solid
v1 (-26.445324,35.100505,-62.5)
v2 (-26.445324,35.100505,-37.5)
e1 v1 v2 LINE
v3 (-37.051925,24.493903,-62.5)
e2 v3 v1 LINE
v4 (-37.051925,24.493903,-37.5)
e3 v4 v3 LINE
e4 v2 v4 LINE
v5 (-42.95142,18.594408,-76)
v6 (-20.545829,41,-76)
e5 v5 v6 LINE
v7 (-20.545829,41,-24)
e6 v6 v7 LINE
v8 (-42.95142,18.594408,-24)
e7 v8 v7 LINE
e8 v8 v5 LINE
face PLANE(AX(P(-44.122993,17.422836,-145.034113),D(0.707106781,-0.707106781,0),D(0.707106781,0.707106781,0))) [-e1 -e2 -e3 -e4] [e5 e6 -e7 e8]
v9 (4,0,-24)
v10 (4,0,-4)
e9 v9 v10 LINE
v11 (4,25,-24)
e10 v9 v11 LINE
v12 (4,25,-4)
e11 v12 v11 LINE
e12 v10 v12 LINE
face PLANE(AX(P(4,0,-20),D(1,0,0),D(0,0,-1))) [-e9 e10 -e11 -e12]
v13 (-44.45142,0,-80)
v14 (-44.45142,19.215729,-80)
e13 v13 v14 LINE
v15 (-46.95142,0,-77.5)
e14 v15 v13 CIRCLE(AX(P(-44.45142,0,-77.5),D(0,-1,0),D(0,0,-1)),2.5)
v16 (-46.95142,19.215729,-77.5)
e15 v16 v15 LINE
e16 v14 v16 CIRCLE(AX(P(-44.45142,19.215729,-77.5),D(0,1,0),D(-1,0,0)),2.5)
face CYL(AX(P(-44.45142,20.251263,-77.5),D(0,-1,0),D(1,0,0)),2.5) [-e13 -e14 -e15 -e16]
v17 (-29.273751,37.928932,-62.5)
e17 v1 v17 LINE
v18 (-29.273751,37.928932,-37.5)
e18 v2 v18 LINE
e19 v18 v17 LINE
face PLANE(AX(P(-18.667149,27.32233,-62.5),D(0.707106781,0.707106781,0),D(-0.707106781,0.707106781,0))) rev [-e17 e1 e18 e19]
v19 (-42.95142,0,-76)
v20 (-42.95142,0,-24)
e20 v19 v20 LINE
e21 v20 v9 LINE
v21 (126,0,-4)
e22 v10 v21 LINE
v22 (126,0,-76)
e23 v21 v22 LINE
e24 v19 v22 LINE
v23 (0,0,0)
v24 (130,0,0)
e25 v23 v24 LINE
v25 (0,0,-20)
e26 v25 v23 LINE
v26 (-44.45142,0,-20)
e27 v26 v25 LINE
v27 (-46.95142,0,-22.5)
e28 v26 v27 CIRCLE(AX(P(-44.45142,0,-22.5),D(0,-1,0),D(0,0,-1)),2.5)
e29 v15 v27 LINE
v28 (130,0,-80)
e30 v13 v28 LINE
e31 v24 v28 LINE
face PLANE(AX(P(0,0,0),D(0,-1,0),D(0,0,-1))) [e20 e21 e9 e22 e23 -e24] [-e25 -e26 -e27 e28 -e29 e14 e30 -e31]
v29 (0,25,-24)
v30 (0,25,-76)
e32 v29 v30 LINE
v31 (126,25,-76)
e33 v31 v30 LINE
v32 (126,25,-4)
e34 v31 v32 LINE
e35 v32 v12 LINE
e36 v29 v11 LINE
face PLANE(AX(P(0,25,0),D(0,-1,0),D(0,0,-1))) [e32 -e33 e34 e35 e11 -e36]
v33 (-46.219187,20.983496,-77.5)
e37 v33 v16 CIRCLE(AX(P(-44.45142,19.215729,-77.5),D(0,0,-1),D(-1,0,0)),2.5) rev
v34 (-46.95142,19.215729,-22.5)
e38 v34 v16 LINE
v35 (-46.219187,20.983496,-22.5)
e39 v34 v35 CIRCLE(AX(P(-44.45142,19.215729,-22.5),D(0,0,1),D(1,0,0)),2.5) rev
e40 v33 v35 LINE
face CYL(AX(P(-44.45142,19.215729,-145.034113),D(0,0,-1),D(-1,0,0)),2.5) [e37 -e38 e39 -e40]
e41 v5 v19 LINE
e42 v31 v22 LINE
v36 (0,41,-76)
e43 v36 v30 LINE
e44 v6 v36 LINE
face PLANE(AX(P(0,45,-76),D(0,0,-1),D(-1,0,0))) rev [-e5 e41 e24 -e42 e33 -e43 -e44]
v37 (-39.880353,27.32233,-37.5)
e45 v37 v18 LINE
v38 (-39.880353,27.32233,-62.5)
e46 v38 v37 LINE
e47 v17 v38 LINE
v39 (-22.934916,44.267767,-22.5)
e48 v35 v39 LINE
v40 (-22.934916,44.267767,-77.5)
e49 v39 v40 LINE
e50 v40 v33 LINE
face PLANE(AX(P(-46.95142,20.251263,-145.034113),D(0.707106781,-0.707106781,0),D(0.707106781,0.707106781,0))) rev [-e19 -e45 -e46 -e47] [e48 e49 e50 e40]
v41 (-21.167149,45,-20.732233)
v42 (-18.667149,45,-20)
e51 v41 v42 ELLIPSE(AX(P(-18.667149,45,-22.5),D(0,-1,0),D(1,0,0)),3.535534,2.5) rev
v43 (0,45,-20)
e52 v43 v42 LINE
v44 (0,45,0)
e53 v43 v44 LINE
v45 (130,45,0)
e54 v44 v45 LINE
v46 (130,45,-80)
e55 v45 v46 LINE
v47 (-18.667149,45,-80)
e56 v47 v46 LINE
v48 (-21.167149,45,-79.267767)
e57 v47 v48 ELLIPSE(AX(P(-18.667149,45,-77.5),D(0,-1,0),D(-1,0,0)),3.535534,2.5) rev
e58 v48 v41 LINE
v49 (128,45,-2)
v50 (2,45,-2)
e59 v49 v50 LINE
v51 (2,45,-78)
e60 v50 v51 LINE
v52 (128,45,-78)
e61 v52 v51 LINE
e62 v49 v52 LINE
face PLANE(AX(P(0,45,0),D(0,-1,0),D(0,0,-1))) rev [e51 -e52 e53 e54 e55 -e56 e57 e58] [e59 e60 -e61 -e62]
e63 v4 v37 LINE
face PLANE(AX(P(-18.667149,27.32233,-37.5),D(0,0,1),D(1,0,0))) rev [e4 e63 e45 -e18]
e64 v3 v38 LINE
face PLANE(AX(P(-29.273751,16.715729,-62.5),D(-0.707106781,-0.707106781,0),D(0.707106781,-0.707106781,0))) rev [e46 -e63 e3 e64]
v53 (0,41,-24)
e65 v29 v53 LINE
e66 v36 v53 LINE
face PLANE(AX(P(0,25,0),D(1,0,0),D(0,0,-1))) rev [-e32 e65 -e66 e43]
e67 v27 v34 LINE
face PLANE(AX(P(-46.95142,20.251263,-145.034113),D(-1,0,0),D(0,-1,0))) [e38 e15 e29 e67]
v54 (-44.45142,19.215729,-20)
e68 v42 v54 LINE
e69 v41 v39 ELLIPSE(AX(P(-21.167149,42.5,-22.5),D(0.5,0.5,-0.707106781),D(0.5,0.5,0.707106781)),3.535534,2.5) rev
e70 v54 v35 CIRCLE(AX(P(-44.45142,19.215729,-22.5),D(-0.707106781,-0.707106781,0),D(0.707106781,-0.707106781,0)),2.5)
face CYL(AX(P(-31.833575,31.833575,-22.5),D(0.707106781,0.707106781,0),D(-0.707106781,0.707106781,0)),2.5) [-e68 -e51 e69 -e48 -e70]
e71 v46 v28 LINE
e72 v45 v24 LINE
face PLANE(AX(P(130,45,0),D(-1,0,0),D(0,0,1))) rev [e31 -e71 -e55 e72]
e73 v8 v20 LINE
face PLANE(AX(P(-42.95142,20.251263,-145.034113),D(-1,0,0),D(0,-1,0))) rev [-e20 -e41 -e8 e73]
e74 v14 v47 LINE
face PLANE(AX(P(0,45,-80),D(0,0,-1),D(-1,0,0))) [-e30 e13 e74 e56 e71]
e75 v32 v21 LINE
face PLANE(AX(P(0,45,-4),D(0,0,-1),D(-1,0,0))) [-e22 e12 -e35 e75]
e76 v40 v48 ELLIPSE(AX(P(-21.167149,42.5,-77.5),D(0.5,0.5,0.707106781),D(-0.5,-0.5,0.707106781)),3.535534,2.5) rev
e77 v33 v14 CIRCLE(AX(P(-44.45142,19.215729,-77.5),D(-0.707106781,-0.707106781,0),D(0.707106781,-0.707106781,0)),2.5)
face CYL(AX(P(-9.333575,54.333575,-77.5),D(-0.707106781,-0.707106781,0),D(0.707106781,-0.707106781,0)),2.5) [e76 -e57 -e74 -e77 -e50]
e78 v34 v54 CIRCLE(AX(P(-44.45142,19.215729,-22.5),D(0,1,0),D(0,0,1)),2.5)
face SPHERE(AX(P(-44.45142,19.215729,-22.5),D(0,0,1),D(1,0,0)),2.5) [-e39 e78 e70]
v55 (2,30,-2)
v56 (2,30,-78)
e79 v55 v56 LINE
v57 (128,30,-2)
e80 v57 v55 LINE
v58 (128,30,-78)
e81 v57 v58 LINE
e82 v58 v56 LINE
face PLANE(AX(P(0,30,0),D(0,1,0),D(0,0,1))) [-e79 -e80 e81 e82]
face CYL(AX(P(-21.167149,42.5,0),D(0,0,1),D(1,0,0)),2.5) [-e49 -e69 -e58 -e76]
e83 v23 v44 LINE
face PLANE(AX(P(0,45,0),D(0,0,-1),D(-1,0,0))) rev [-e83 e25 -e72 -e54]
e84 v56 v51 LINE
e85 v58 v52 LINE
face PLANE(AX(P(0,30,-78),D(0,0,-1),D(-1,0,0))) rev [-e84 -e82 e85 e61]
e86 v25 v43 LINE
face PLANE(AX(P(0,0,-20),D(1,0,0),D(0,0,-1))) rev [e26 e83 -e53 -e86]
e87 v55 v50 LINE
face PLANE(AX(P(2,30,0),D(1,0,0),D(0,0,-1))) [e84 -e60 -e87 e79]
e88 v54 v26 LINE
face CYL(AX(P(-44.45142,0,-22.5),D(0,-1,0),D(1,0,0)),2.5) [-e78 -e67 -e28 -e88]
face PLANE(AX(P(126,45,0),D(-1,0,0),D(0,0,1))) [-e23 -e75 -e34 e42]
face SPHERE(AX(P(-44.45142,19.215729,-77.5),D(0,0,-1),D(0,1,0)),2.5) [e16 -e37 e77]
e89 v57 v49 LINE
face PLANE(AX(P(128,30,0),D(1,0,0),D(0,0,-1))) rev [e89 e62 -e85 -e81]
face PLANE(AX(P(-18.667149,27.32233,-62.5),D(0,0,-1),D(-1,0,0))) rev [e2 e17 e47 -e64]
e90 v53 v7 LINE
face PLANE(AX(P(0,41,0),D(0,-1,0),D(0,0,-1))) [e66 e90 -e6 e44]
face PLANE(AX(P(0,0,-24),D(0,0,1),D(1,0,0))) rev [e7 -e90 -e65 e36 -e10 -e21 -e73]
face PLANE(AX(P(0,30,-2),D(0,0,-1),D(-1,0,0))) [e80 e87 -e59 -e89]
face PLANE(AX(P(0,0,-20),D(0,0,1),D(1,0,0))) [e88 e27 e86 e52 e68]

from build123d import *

# Parameters (mm, degrees)
SKETCH1_W           = 130
SKETCH1_H           = 80
BOSS_EXTRUDE1_DEPTH = 45
BOSS_EXTRUDE3_DEPTH = 80
CUT_EXTRUDE1_DEPTH  = 20
FILLET2_R           = 2.5
SHELL2_START        = -76
SHELL2_OUTLINE_W    = 122
SHELL2_OUTLINE_H    = 41
SHELL2_DEPTH        = 72
SHELL2_2_DEPTH      = 52
SKETCH9_W           = 130
SKETCH9_H           = 80
BOSS_EXTRUDE7_DEPTH = 20
SKETCH9_3_W         = 126
SKETCH9_3_H         = 76
CUT_EXTRUDE3_DEPTH  = 15
SKETCH10_W          = 25
SKETCH10_H          = 15
CUT_EXTRUDE4_DEPTH  = 15


# Read off the part's stored shape, not the designer's step: Shell2
with BuildPart() as part:
    # Sketch1 → Boss-Extrude1 (new body)
    with BuildSketch(Plane(origin=(0, 0, 0), x_dir=(1, 0, 0), z_dir=(0, 1, 0))):
        with Locations((65, 40)):
            Rectangle(SKETCH1_W, SKETCH1_H)
    extrude(amount=BOSS_EXTRUDE1_DEPTH)

    # Sketch3 → Boss-Extrude3 (add)
    with BuildSketch(Plane.XY):
        Polygon((0, 0), (0, 45), (-22.202683057, 45), (-46.951420398, 20.251262658), (-46.951420398, 0), align=None)
    extrude(amount=-BOSS_EXTRUDE3_DEPTH)

    # Sketch3<4> → Cut-Extrude1 (cut)
    with BuildSketch(Plane.XY):
        Polygon((0, 0), (0, 45), (-22.202683057, 45), (-46.951420398, 20.251262658), (-46.951420398, 0), align=None)
    extrude(amount=-CUT_EXTRUDE1_DEPTH, mode=Mode.SUBTRACT)

    # Fillet2
    fillet2_edges = [part.edges().sort_by_distance(p)[0] for p in [
        (-34.577051727, 32.625631329, -80),
        (-22.202683057, 45, -50),
        (-46.951420398, 20.251262658, -50),
        (-46.951420398, 10.125631329, -80),
        (-46.951420398, 10.125631329, -20),
        (-34.577051727, 32.625631329, -20),
    ]]
    fillet(fillet2_edges, radius=FILLET2_R)

    # Shell2 outline → Shell2 (cut)
    with BuildSketch(Plane.XY.offset(SHELL2_START)):
        with Locations((65, 20.5)):
            Rectangle(SHELL2_OUTLINE_W, SHELL2_OUTLINE_H)
    extrude(amount=SHELL2_DEPTH, mode=Mode.SUBTRACT)

    # Shell2 2 outline → Shell2 2 (cut)
    with BuildSketch(Plane.XY.offset(SHELL2_START)):
        Polygon((-20.545828807, 41), (-42.951420398, 18.594408409), (-42.951420398, 0), (4, 0), (4, 41), align=None)
    extrude(amount=SHELL2_2_DEPTH, mode=Mode.SUBTRACT)

    # Sketch9 → Boss-Extrude7 (add)
    with BuildSketch(Plane(origin=(0, 45, 0), x_dir=(1, 0, 0), z_dir=(0, 1, 0))):
        with Locations((65, 40)):
            Rectangle(SKETCH9_W, SKETCH9_H)
    extrude(amount=-BOSS_EXTRUDE7_DEPTH)

    # Sketch9<3> → Cut-Extrude3 (cut)
    with BuildSketch(Plane(origin=(0, 45, 0), x_dir=(1, 0, 0), z_dir=(0, 1, 0))):
        with Locations((65, 40)):
            Rectangle(SKETCH9_3_W, SKETCH9_3_H)
    extrude(amount=-CUT_EXTRUDE3_DEPTH, mode=Mode.SUBTRACT)

    # Sketch10 → Cut-Extrude4 (cut)
    with BuildSketch(Plane(origin=(-33.601341528, 33.601341528, 0), x_dir=(0, 0, 1), z_dir=(-0.7071067811865477, 0.7071067811865475, 0))):
        with Locations((-50, -1.379862597)):
            Rectangle(SKETCH10_W, SKETCH10_H)
    extrude(amount=-CUT_EXTRUDE4_DEPTH, mode=Mode.SUBTRACT)


solid = part.part
